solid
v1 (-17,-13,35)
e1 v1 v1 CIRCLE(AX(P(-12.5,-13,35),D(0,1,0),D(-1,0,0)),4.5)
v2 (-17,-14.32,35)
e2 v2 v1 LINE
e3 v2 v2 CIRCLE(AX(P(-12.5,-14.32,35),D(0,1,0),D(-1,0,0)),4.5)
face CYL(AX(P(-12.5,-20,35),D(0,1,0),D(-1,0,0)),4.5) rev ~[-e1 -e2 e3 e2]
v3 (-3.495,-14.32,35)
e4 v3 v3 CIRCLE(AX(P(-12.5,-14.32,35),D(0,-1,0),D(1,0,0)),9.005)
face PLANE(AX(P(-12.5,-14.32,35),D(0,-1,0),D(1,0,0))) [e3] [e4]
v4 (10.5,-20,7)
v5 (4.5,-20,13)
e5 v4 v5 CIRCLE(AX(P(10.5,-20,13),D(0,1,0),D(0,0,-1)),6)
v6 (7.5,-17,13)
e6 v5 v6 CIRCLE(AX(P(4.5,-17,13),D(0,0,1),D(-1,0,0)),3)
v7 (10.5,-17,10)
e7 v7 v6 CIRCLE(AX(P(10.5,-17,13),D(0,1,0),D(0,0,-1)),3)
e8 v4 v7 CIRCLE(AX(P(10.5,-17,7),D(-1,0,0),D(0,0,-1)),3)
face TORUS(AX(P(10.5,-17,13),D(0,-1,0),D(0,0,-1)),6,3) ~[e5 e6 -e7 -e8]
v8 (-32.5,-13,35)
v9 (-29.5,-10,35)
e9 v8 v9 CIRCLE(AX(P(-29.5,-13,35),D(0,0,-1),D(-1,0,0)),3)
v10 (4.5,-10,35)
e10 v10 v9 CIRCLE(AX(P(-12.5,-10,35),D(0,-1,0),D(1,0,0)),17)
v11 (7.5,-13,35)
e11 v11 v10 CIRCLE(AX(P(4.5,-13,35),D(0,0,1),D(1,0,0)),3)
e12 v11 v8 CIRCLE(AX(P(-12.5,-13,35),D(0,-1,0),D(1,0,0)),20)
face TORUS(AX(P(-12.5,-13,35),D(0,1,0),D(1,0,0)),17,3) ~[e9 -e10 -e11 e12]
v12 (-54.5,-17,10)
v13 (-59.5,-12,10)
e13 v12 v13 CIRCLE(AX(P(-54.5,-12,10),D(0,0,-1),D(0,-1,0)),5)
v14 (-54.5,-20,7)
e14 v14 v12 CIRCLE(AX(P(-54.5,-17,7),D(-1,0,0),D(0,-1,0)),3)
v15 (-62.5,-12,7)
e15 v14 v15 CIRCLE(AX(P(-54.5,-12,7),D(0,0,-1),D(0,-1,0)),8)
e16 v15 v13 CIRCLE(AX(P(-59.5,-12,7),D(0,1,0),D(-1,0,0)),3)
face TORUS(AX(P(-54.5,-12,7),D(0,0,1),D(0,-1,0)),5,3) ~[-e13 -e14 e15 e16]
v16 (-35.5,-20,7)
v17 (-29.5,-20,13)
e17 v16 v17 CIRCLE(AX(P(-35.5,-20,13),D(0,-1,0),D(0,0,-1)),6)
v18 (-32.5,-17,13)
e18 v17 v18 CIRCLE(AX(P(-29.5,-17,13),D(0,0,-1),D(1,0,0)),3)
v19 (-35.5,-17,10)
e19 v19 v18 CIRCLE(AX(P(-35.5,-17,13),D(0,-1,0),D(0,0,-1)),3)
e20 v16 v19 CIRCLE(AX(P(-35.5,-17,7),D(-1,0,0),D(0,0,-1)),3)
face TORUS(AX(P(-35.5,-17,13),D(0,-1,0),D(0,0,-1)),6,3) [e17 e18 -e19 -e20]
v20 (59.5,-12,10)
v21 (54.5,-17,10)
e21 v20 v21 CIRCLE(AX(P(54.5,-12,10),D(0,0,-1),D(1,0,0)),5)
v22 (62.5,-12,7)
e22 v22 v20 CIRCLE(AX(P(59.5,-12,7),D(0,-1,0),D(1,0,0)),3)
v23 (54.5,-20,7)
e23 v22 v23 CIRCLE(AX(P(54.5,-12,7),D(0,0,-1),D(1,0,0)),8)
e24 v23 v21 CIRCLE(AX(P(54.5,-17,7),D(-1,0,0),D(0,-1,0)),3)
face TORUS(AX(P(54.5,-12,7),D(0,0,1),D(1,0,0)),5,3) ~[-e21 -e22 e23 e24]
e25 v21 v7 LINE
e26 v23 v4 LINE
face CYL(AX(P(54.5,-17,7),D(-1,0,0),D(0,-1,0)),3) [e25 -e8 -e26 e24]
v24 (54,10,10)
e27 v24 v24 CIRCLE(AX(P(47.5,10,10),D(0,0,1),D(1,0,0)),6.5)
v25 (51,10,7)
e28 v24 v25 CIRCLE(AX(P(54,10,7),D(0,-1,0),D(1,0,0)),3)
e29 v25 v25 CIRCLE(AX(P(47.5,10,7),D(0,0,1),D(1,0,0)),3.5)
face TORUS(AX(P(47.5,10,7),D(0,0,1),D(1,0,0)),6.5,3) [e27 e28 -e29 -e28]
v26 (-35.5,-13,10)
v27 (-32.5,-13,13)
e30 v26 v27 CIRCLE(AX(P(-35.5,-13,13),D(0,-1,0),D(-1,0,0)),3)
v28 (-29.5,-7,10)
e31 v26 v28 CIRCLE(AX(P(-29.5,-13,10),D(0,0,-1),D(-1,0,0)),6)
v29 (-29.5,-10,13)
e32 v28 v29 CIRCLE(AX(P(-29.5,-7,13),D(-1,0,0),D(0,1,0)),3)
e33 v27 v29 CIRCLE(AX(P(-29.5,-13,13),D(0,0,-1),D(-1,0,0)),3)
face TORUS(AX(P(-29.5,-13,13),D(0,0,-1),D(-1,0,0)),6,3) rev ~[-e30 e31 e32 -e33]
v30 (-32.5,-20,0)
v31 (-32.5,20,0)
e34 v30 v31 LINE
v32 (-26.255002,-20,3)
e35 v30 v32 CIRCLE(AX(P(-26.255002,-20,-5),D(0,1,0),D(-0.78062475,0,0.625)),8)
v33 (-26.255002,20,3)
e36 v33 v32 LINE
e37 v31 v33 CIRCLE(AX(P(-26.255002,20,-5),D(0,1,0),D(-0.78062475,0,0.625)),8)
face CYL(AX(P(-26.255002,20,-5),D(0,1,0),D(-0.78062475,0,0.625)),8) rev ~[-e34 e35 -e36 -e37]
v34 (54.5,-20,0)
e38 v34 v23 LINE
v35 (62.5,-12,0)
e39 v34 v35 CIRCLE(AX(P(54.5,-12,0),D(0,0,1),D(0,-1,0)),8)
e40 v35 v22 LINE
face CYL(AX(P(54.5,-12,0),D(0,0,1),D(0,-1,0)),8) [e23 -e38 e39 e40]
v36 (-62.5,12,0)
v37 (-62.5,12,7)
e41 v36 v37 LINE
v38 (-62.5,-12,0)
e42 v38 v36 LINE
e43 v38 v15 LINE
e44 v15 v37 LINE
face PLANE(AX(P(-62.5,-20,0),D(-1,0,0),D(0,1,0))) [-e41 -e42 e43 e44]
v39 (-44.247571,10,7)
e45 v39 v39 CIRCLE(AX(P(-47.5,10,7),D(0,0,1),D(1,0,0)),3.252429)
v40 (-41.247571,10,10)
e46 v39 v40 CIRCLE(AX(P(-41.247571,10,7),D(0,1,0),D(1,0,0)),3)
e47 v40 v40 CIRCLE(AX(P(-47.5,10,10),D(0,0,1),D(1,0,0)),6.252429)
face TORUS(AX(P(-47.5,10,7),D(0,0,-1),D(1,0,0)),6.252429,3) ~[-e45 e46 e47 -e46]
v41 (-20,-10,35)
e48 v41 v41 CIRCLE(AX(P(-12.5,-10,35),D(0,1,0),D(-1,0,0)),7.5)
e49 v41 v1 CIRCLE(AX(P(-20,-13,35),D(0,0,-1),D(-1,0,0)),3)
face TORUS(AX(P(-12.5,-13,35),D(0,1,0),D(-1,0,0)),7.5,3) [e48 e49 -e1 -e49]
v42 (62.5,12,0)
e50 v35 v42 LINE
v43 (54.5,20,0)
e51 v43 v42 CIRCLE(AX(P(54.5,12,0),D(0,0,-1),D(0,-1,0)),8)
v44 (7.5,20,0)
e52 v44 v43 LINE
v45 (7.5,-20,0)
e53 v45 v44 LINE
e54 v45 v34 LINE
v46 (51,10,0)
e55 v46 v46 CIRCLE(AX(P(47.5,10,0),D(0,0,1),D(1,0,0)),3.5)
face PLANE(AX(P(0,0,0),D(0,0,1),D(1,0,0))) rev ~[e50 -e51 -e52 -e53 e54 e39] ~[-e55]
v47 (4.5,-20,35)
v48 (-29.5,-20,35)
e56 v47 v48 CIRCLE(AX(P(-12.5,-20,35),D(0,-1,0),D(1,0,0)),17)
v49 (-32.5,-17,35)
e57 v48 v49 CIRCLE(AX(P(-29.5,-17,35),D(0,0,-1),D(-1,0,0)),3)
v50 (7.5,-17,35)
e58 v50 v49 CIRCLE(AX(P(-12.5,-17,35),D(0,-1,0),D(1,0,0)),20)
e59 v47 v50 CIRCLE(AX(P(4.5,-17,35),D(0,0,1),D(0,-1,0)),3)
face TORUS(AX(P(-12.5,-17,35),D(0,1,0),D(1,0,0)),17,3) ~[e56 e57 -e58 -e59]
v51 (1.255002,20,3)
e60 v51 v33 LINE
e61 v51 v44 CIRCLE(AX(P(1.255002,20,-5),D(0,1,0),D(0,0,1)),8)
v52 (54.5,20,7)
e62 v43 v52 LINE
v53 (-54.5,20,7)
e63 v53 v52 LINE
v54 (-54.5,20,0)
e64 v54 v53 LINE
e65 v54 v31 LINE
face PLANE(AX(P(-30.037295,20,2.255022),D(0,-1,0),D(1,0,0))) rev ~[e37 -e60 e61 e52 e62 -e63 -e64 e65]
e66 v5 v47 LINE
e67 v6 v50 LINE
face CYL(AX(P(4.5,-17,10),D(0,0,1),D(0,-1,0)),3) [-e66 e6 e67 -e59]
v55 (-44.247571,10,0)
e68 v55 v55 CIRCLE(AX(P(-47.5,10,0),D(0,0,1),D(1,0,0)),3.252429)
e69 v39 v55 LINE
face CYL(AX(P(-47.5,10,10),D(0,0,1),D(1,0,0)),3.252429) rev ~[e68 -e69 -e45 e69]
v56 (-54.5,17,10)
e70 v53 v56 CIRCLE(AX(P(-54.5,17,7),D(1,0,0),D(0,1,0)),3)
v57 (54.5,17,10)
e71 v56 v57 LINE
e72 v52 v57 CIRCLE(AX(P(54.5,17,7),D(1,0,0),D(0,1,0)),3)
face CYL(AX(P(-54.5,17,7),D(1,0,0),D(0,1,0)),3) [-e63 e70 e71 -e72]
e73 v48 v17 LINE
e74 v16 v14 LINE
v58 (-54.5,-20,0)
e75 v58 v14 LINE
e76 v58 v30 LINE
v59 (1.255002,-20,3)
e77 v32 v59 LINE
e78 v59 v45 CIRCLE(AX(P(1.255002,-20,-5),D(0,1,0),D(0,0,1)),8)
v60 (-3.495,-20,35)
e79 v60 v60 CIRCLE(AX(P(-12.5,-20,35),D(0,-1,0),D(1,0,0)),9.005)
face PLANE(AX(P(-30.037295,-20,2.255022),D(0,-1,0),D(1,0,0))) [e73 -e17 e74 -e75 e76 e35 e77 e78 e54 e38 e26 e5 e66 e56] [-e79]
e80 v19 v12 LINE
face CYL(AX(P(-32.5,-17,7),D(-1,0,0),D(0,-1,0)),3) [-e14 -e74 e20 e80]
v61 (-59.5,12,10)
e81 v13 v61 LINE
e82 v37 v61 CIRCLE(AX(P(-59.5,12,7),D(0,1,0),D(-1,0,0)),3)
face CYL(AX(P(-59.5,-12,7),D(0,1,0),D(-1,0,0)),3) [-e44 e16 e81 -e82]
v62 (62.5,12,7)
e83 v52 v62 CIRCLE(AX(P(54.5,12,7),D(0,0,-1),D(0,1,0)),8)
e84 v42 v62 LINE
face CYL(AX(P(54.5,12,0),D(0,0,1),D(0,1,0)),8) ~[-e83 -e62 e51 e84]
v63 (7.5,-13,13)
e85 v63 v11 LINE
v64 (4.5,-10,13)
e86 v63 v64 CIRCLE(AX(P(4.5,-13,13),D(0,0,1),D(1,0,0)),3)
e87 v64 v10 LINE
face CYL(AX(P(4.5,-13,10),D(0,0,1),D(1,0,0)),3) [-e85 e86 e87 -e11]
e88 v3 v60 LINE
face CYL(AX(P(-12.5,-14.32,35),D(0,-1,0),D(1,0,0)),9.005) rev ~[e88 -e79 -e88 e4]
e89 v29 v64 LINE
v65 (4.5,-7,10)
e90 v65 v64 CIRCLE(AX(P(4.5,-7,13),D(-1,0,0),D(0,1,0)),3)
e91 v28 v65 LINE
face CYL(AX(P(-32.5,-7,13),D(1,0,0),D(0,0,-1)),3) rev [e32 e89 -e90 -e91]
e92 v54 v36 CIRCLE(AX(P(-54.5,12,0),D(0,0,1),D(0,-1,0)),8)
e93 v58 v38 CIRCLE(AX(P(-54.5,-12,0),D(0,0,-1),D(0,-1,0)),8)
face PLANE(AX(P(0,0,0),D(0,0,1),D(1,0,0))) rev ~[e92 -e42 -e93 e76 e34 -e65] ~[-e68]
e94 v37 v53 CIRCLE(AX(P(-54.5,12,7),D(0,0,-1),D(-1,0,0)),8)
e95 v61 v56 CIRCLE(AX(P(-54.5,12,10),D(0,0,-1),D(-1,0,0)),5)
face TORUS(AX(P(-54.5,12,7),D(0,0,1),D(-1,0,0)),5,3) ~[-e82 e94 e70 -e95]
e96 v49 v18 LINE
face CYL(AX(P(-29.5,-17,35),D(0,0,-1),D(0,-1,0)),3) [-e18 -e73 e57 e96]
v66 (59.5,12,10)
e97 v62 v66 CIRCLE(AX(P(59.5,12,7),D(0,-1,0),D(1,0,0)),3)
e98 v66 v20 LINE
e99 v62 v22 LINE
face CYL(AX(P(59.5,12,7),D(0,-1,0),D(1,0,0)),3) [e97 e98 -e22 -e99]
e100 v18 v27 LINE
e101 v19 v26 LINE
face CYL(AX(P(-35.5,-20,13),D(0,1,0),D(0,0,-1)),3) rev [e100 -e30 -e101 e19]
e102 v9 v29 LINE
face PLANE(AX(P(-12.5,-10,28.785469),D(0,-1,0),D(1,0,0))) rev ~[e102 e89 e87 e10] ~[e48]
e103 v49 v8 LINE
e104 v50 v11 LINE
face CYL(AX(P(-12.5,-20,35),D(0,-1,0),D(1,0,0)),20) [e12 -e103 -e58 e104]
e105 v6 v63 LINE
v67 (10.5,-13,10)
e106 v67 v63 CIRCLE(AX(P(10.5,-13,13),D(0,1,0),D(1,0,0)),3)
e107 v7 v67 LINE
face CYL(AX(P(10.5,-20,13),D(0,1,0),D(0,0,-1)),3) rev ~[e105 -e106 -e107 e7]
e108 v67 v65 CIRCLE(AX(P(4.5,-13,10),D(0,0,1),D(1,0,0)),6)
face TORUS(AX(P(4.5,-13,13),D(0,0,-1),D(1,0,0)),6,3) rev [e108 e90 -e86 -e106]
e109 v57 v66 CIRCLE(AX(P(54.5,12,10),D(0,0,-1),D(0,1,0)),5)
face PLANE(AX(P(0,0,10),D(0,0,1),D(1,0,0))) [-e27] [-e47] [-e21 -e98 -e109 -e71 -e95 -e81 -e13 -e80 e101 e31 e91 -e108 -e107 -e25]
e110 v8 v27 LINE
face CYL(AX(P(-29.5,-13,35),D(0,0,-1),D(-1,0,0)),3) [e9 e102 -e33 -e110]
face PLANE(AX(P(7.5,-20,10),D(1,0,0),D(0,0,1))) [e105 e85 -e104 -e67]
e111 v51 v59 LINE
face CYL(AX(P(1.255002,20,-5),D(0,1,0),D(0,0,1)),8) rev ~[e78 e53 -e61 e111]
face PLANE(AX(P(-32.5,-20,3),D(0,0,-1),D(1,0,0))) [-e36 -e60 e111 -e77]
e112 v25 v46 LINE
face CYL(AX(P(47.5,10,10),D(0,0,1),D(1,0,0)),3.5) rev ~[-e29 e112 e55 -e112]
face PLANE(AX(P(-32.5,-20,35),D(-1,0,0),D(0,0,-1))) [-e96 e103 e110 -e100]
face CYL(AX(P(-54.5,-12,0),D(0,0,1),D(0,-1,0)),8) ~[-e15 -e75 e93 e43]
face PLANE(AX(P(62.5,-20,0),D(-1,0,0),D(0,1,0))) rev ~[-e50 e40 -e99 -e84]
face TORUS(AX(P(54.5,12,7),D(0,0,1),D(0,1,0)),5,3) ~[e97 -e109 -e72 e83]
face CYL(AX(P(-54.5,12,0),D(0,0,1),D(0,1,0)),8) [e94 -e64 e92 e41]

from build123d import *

# Parameters (mm, degrees)
F0_W           = 125
F0_H           = 40
F1_DEPTH       = 10
F3_DEPTH       = 10
F5_D           = 9
F5_CBORE_D     = 18.01
F5_CBORE_DEPTH = 5.68
F6_W           = 40
F6_H           = 3
F7_DEPTH       = 40.001
F8_T1_DEPTH    = 40
F9_R           = 3.2524289183
F10_DEPTH      = 10.001
F11_R          = 3.5
F12_DEPTH      = 25
F13_R          = 8
F14_R          = 3


# Not quite as in the source:
# - a fillet or chamfer that OpenCascade refuses, or shapes differently, is made with other operations: its cross-section is extruded or revolved along the edge and cut away or added


with BuildPart() as f1:
    # F0 (on Top) → F1 (new body)
    with BuildSketch(Plane.XY):
        Rectangle(F0_W, F0_H)
    extrude(amount=F1_DEPTH)

    # F2 (on face) → F3 (join)
    with BuildSketch(Plane.XZ.offset(20)):
        with BuildLine():
            Line((-32.5, 35), (-32.5, 10))
            Line((-32.5, 10), (7.5, 10))
            Line((7.5, 10), (7.5, 35))
            ThreePointArc((7.5, 35), (-12.5, 55), (-32.5, 35))
        make_face()
    extrude(amount=-F3_DEPTH)

    # F5 (through all)
    with Locations(Plane.XZ.offset(20)):
        with Locations((-12.5, 35)):
            CounterBoreHole(F5_D / 2, F5_CBORE_D / 2, F5_CBORE_DEPTH)

    # F6 (on face) → F7 (cut, through all)
    with BuildSketch(Plane.XZ.offset(20)):
        with Locations((-12.5, 1.5)):
            Rectangle(F6_W, F6_H)
    extrude(amount=-F7_DEPTH, mode=Mode.SUBTRACT)

    # F8: fillet of radius 8 on 2 edges, made by hand

    # F8_s2 → F8_t1 (join)
    with BuildSketch(Plane.XZ.offset(-20)):
        with BuildLine():
            ThreePointArc((-32.5, 0), (-29.7191036167, 2.2111025509), (-26.2550020016, 3))
            Line((-26.2550020016, 3), (-32.5, 3))
            Line((-32.5, 3), (-32.5, 0))
        make_face()
        with BuildLine():
            ThreePointArc((1.2550020016, 3), (4.7191036167, 2.2111025509), (7.5, 0))
            Line((7.5, 0), (7.5, 3))
            Line((7.5, 3), (1.2550020016, 3))
        make_face()
    extrude(amount=F8_T1_DEPTH)

    # F9 (on face) → F10 (cut, through all)
    with BuildSketch(Plane.XY.offset(10)):
        with Locations((-47.5, 10)):
            Circle(F9_R)
    extrude(amount=-F10_DEPTH, mode=Mode.SUBTRACT)

    # F11 (on face) → F12 (cut)
    with BuildSketch(Plane.XY.offset(10)):
        with Locations((47.5, 10)):
            Circle(F11_R)
    extrude(amount=-F12_DEPTH, mode=Mode.SUBTRACT)

    # F13
    f13_edges = [f1.edges().sort_by_distance(p)[0] for p in [
        (62.5, -20, 5),
        (-62.5, -20, 5),
        (-62.5, 20, 5),
        (62.5, 20, 5),
    ]]
    fillet(f13_edges, radius=F13_R)

    # F14
    f14_edges = [f1.edges().sort_by_distance(p)[0] for p in [
        (7.5, -15, 10),
        (-32.5, -15, 10),
        (-62.5, 0, 10),
        (-60.156854, 17.656854, 10),
        (-60.156854, -17.656854, 10),
        (0, 20, 10),
        (-43.5, -20, 10),
        (60.156854, 17.656854, 10),
        (62.5, 0, 10),
        (-12.5, -10, 10),
        (60.156854, -17.656854, 10),
        (31, -20, 10),
        (-50.752429, 10, 10),
        (44, 10, 10),
        (-12.5, -10, 55),
        (7.5, -10, 22.5),
        (-32.5, -10, 22.5),
        (-17, -10, 35),
        (-32.5, -20, 22.5),
        (-12.5, -20, 55),
        (7.5, -20, 22.5),
    ]]
    fillet(f14_edges, radius=F14_R)


solid = f1.part
